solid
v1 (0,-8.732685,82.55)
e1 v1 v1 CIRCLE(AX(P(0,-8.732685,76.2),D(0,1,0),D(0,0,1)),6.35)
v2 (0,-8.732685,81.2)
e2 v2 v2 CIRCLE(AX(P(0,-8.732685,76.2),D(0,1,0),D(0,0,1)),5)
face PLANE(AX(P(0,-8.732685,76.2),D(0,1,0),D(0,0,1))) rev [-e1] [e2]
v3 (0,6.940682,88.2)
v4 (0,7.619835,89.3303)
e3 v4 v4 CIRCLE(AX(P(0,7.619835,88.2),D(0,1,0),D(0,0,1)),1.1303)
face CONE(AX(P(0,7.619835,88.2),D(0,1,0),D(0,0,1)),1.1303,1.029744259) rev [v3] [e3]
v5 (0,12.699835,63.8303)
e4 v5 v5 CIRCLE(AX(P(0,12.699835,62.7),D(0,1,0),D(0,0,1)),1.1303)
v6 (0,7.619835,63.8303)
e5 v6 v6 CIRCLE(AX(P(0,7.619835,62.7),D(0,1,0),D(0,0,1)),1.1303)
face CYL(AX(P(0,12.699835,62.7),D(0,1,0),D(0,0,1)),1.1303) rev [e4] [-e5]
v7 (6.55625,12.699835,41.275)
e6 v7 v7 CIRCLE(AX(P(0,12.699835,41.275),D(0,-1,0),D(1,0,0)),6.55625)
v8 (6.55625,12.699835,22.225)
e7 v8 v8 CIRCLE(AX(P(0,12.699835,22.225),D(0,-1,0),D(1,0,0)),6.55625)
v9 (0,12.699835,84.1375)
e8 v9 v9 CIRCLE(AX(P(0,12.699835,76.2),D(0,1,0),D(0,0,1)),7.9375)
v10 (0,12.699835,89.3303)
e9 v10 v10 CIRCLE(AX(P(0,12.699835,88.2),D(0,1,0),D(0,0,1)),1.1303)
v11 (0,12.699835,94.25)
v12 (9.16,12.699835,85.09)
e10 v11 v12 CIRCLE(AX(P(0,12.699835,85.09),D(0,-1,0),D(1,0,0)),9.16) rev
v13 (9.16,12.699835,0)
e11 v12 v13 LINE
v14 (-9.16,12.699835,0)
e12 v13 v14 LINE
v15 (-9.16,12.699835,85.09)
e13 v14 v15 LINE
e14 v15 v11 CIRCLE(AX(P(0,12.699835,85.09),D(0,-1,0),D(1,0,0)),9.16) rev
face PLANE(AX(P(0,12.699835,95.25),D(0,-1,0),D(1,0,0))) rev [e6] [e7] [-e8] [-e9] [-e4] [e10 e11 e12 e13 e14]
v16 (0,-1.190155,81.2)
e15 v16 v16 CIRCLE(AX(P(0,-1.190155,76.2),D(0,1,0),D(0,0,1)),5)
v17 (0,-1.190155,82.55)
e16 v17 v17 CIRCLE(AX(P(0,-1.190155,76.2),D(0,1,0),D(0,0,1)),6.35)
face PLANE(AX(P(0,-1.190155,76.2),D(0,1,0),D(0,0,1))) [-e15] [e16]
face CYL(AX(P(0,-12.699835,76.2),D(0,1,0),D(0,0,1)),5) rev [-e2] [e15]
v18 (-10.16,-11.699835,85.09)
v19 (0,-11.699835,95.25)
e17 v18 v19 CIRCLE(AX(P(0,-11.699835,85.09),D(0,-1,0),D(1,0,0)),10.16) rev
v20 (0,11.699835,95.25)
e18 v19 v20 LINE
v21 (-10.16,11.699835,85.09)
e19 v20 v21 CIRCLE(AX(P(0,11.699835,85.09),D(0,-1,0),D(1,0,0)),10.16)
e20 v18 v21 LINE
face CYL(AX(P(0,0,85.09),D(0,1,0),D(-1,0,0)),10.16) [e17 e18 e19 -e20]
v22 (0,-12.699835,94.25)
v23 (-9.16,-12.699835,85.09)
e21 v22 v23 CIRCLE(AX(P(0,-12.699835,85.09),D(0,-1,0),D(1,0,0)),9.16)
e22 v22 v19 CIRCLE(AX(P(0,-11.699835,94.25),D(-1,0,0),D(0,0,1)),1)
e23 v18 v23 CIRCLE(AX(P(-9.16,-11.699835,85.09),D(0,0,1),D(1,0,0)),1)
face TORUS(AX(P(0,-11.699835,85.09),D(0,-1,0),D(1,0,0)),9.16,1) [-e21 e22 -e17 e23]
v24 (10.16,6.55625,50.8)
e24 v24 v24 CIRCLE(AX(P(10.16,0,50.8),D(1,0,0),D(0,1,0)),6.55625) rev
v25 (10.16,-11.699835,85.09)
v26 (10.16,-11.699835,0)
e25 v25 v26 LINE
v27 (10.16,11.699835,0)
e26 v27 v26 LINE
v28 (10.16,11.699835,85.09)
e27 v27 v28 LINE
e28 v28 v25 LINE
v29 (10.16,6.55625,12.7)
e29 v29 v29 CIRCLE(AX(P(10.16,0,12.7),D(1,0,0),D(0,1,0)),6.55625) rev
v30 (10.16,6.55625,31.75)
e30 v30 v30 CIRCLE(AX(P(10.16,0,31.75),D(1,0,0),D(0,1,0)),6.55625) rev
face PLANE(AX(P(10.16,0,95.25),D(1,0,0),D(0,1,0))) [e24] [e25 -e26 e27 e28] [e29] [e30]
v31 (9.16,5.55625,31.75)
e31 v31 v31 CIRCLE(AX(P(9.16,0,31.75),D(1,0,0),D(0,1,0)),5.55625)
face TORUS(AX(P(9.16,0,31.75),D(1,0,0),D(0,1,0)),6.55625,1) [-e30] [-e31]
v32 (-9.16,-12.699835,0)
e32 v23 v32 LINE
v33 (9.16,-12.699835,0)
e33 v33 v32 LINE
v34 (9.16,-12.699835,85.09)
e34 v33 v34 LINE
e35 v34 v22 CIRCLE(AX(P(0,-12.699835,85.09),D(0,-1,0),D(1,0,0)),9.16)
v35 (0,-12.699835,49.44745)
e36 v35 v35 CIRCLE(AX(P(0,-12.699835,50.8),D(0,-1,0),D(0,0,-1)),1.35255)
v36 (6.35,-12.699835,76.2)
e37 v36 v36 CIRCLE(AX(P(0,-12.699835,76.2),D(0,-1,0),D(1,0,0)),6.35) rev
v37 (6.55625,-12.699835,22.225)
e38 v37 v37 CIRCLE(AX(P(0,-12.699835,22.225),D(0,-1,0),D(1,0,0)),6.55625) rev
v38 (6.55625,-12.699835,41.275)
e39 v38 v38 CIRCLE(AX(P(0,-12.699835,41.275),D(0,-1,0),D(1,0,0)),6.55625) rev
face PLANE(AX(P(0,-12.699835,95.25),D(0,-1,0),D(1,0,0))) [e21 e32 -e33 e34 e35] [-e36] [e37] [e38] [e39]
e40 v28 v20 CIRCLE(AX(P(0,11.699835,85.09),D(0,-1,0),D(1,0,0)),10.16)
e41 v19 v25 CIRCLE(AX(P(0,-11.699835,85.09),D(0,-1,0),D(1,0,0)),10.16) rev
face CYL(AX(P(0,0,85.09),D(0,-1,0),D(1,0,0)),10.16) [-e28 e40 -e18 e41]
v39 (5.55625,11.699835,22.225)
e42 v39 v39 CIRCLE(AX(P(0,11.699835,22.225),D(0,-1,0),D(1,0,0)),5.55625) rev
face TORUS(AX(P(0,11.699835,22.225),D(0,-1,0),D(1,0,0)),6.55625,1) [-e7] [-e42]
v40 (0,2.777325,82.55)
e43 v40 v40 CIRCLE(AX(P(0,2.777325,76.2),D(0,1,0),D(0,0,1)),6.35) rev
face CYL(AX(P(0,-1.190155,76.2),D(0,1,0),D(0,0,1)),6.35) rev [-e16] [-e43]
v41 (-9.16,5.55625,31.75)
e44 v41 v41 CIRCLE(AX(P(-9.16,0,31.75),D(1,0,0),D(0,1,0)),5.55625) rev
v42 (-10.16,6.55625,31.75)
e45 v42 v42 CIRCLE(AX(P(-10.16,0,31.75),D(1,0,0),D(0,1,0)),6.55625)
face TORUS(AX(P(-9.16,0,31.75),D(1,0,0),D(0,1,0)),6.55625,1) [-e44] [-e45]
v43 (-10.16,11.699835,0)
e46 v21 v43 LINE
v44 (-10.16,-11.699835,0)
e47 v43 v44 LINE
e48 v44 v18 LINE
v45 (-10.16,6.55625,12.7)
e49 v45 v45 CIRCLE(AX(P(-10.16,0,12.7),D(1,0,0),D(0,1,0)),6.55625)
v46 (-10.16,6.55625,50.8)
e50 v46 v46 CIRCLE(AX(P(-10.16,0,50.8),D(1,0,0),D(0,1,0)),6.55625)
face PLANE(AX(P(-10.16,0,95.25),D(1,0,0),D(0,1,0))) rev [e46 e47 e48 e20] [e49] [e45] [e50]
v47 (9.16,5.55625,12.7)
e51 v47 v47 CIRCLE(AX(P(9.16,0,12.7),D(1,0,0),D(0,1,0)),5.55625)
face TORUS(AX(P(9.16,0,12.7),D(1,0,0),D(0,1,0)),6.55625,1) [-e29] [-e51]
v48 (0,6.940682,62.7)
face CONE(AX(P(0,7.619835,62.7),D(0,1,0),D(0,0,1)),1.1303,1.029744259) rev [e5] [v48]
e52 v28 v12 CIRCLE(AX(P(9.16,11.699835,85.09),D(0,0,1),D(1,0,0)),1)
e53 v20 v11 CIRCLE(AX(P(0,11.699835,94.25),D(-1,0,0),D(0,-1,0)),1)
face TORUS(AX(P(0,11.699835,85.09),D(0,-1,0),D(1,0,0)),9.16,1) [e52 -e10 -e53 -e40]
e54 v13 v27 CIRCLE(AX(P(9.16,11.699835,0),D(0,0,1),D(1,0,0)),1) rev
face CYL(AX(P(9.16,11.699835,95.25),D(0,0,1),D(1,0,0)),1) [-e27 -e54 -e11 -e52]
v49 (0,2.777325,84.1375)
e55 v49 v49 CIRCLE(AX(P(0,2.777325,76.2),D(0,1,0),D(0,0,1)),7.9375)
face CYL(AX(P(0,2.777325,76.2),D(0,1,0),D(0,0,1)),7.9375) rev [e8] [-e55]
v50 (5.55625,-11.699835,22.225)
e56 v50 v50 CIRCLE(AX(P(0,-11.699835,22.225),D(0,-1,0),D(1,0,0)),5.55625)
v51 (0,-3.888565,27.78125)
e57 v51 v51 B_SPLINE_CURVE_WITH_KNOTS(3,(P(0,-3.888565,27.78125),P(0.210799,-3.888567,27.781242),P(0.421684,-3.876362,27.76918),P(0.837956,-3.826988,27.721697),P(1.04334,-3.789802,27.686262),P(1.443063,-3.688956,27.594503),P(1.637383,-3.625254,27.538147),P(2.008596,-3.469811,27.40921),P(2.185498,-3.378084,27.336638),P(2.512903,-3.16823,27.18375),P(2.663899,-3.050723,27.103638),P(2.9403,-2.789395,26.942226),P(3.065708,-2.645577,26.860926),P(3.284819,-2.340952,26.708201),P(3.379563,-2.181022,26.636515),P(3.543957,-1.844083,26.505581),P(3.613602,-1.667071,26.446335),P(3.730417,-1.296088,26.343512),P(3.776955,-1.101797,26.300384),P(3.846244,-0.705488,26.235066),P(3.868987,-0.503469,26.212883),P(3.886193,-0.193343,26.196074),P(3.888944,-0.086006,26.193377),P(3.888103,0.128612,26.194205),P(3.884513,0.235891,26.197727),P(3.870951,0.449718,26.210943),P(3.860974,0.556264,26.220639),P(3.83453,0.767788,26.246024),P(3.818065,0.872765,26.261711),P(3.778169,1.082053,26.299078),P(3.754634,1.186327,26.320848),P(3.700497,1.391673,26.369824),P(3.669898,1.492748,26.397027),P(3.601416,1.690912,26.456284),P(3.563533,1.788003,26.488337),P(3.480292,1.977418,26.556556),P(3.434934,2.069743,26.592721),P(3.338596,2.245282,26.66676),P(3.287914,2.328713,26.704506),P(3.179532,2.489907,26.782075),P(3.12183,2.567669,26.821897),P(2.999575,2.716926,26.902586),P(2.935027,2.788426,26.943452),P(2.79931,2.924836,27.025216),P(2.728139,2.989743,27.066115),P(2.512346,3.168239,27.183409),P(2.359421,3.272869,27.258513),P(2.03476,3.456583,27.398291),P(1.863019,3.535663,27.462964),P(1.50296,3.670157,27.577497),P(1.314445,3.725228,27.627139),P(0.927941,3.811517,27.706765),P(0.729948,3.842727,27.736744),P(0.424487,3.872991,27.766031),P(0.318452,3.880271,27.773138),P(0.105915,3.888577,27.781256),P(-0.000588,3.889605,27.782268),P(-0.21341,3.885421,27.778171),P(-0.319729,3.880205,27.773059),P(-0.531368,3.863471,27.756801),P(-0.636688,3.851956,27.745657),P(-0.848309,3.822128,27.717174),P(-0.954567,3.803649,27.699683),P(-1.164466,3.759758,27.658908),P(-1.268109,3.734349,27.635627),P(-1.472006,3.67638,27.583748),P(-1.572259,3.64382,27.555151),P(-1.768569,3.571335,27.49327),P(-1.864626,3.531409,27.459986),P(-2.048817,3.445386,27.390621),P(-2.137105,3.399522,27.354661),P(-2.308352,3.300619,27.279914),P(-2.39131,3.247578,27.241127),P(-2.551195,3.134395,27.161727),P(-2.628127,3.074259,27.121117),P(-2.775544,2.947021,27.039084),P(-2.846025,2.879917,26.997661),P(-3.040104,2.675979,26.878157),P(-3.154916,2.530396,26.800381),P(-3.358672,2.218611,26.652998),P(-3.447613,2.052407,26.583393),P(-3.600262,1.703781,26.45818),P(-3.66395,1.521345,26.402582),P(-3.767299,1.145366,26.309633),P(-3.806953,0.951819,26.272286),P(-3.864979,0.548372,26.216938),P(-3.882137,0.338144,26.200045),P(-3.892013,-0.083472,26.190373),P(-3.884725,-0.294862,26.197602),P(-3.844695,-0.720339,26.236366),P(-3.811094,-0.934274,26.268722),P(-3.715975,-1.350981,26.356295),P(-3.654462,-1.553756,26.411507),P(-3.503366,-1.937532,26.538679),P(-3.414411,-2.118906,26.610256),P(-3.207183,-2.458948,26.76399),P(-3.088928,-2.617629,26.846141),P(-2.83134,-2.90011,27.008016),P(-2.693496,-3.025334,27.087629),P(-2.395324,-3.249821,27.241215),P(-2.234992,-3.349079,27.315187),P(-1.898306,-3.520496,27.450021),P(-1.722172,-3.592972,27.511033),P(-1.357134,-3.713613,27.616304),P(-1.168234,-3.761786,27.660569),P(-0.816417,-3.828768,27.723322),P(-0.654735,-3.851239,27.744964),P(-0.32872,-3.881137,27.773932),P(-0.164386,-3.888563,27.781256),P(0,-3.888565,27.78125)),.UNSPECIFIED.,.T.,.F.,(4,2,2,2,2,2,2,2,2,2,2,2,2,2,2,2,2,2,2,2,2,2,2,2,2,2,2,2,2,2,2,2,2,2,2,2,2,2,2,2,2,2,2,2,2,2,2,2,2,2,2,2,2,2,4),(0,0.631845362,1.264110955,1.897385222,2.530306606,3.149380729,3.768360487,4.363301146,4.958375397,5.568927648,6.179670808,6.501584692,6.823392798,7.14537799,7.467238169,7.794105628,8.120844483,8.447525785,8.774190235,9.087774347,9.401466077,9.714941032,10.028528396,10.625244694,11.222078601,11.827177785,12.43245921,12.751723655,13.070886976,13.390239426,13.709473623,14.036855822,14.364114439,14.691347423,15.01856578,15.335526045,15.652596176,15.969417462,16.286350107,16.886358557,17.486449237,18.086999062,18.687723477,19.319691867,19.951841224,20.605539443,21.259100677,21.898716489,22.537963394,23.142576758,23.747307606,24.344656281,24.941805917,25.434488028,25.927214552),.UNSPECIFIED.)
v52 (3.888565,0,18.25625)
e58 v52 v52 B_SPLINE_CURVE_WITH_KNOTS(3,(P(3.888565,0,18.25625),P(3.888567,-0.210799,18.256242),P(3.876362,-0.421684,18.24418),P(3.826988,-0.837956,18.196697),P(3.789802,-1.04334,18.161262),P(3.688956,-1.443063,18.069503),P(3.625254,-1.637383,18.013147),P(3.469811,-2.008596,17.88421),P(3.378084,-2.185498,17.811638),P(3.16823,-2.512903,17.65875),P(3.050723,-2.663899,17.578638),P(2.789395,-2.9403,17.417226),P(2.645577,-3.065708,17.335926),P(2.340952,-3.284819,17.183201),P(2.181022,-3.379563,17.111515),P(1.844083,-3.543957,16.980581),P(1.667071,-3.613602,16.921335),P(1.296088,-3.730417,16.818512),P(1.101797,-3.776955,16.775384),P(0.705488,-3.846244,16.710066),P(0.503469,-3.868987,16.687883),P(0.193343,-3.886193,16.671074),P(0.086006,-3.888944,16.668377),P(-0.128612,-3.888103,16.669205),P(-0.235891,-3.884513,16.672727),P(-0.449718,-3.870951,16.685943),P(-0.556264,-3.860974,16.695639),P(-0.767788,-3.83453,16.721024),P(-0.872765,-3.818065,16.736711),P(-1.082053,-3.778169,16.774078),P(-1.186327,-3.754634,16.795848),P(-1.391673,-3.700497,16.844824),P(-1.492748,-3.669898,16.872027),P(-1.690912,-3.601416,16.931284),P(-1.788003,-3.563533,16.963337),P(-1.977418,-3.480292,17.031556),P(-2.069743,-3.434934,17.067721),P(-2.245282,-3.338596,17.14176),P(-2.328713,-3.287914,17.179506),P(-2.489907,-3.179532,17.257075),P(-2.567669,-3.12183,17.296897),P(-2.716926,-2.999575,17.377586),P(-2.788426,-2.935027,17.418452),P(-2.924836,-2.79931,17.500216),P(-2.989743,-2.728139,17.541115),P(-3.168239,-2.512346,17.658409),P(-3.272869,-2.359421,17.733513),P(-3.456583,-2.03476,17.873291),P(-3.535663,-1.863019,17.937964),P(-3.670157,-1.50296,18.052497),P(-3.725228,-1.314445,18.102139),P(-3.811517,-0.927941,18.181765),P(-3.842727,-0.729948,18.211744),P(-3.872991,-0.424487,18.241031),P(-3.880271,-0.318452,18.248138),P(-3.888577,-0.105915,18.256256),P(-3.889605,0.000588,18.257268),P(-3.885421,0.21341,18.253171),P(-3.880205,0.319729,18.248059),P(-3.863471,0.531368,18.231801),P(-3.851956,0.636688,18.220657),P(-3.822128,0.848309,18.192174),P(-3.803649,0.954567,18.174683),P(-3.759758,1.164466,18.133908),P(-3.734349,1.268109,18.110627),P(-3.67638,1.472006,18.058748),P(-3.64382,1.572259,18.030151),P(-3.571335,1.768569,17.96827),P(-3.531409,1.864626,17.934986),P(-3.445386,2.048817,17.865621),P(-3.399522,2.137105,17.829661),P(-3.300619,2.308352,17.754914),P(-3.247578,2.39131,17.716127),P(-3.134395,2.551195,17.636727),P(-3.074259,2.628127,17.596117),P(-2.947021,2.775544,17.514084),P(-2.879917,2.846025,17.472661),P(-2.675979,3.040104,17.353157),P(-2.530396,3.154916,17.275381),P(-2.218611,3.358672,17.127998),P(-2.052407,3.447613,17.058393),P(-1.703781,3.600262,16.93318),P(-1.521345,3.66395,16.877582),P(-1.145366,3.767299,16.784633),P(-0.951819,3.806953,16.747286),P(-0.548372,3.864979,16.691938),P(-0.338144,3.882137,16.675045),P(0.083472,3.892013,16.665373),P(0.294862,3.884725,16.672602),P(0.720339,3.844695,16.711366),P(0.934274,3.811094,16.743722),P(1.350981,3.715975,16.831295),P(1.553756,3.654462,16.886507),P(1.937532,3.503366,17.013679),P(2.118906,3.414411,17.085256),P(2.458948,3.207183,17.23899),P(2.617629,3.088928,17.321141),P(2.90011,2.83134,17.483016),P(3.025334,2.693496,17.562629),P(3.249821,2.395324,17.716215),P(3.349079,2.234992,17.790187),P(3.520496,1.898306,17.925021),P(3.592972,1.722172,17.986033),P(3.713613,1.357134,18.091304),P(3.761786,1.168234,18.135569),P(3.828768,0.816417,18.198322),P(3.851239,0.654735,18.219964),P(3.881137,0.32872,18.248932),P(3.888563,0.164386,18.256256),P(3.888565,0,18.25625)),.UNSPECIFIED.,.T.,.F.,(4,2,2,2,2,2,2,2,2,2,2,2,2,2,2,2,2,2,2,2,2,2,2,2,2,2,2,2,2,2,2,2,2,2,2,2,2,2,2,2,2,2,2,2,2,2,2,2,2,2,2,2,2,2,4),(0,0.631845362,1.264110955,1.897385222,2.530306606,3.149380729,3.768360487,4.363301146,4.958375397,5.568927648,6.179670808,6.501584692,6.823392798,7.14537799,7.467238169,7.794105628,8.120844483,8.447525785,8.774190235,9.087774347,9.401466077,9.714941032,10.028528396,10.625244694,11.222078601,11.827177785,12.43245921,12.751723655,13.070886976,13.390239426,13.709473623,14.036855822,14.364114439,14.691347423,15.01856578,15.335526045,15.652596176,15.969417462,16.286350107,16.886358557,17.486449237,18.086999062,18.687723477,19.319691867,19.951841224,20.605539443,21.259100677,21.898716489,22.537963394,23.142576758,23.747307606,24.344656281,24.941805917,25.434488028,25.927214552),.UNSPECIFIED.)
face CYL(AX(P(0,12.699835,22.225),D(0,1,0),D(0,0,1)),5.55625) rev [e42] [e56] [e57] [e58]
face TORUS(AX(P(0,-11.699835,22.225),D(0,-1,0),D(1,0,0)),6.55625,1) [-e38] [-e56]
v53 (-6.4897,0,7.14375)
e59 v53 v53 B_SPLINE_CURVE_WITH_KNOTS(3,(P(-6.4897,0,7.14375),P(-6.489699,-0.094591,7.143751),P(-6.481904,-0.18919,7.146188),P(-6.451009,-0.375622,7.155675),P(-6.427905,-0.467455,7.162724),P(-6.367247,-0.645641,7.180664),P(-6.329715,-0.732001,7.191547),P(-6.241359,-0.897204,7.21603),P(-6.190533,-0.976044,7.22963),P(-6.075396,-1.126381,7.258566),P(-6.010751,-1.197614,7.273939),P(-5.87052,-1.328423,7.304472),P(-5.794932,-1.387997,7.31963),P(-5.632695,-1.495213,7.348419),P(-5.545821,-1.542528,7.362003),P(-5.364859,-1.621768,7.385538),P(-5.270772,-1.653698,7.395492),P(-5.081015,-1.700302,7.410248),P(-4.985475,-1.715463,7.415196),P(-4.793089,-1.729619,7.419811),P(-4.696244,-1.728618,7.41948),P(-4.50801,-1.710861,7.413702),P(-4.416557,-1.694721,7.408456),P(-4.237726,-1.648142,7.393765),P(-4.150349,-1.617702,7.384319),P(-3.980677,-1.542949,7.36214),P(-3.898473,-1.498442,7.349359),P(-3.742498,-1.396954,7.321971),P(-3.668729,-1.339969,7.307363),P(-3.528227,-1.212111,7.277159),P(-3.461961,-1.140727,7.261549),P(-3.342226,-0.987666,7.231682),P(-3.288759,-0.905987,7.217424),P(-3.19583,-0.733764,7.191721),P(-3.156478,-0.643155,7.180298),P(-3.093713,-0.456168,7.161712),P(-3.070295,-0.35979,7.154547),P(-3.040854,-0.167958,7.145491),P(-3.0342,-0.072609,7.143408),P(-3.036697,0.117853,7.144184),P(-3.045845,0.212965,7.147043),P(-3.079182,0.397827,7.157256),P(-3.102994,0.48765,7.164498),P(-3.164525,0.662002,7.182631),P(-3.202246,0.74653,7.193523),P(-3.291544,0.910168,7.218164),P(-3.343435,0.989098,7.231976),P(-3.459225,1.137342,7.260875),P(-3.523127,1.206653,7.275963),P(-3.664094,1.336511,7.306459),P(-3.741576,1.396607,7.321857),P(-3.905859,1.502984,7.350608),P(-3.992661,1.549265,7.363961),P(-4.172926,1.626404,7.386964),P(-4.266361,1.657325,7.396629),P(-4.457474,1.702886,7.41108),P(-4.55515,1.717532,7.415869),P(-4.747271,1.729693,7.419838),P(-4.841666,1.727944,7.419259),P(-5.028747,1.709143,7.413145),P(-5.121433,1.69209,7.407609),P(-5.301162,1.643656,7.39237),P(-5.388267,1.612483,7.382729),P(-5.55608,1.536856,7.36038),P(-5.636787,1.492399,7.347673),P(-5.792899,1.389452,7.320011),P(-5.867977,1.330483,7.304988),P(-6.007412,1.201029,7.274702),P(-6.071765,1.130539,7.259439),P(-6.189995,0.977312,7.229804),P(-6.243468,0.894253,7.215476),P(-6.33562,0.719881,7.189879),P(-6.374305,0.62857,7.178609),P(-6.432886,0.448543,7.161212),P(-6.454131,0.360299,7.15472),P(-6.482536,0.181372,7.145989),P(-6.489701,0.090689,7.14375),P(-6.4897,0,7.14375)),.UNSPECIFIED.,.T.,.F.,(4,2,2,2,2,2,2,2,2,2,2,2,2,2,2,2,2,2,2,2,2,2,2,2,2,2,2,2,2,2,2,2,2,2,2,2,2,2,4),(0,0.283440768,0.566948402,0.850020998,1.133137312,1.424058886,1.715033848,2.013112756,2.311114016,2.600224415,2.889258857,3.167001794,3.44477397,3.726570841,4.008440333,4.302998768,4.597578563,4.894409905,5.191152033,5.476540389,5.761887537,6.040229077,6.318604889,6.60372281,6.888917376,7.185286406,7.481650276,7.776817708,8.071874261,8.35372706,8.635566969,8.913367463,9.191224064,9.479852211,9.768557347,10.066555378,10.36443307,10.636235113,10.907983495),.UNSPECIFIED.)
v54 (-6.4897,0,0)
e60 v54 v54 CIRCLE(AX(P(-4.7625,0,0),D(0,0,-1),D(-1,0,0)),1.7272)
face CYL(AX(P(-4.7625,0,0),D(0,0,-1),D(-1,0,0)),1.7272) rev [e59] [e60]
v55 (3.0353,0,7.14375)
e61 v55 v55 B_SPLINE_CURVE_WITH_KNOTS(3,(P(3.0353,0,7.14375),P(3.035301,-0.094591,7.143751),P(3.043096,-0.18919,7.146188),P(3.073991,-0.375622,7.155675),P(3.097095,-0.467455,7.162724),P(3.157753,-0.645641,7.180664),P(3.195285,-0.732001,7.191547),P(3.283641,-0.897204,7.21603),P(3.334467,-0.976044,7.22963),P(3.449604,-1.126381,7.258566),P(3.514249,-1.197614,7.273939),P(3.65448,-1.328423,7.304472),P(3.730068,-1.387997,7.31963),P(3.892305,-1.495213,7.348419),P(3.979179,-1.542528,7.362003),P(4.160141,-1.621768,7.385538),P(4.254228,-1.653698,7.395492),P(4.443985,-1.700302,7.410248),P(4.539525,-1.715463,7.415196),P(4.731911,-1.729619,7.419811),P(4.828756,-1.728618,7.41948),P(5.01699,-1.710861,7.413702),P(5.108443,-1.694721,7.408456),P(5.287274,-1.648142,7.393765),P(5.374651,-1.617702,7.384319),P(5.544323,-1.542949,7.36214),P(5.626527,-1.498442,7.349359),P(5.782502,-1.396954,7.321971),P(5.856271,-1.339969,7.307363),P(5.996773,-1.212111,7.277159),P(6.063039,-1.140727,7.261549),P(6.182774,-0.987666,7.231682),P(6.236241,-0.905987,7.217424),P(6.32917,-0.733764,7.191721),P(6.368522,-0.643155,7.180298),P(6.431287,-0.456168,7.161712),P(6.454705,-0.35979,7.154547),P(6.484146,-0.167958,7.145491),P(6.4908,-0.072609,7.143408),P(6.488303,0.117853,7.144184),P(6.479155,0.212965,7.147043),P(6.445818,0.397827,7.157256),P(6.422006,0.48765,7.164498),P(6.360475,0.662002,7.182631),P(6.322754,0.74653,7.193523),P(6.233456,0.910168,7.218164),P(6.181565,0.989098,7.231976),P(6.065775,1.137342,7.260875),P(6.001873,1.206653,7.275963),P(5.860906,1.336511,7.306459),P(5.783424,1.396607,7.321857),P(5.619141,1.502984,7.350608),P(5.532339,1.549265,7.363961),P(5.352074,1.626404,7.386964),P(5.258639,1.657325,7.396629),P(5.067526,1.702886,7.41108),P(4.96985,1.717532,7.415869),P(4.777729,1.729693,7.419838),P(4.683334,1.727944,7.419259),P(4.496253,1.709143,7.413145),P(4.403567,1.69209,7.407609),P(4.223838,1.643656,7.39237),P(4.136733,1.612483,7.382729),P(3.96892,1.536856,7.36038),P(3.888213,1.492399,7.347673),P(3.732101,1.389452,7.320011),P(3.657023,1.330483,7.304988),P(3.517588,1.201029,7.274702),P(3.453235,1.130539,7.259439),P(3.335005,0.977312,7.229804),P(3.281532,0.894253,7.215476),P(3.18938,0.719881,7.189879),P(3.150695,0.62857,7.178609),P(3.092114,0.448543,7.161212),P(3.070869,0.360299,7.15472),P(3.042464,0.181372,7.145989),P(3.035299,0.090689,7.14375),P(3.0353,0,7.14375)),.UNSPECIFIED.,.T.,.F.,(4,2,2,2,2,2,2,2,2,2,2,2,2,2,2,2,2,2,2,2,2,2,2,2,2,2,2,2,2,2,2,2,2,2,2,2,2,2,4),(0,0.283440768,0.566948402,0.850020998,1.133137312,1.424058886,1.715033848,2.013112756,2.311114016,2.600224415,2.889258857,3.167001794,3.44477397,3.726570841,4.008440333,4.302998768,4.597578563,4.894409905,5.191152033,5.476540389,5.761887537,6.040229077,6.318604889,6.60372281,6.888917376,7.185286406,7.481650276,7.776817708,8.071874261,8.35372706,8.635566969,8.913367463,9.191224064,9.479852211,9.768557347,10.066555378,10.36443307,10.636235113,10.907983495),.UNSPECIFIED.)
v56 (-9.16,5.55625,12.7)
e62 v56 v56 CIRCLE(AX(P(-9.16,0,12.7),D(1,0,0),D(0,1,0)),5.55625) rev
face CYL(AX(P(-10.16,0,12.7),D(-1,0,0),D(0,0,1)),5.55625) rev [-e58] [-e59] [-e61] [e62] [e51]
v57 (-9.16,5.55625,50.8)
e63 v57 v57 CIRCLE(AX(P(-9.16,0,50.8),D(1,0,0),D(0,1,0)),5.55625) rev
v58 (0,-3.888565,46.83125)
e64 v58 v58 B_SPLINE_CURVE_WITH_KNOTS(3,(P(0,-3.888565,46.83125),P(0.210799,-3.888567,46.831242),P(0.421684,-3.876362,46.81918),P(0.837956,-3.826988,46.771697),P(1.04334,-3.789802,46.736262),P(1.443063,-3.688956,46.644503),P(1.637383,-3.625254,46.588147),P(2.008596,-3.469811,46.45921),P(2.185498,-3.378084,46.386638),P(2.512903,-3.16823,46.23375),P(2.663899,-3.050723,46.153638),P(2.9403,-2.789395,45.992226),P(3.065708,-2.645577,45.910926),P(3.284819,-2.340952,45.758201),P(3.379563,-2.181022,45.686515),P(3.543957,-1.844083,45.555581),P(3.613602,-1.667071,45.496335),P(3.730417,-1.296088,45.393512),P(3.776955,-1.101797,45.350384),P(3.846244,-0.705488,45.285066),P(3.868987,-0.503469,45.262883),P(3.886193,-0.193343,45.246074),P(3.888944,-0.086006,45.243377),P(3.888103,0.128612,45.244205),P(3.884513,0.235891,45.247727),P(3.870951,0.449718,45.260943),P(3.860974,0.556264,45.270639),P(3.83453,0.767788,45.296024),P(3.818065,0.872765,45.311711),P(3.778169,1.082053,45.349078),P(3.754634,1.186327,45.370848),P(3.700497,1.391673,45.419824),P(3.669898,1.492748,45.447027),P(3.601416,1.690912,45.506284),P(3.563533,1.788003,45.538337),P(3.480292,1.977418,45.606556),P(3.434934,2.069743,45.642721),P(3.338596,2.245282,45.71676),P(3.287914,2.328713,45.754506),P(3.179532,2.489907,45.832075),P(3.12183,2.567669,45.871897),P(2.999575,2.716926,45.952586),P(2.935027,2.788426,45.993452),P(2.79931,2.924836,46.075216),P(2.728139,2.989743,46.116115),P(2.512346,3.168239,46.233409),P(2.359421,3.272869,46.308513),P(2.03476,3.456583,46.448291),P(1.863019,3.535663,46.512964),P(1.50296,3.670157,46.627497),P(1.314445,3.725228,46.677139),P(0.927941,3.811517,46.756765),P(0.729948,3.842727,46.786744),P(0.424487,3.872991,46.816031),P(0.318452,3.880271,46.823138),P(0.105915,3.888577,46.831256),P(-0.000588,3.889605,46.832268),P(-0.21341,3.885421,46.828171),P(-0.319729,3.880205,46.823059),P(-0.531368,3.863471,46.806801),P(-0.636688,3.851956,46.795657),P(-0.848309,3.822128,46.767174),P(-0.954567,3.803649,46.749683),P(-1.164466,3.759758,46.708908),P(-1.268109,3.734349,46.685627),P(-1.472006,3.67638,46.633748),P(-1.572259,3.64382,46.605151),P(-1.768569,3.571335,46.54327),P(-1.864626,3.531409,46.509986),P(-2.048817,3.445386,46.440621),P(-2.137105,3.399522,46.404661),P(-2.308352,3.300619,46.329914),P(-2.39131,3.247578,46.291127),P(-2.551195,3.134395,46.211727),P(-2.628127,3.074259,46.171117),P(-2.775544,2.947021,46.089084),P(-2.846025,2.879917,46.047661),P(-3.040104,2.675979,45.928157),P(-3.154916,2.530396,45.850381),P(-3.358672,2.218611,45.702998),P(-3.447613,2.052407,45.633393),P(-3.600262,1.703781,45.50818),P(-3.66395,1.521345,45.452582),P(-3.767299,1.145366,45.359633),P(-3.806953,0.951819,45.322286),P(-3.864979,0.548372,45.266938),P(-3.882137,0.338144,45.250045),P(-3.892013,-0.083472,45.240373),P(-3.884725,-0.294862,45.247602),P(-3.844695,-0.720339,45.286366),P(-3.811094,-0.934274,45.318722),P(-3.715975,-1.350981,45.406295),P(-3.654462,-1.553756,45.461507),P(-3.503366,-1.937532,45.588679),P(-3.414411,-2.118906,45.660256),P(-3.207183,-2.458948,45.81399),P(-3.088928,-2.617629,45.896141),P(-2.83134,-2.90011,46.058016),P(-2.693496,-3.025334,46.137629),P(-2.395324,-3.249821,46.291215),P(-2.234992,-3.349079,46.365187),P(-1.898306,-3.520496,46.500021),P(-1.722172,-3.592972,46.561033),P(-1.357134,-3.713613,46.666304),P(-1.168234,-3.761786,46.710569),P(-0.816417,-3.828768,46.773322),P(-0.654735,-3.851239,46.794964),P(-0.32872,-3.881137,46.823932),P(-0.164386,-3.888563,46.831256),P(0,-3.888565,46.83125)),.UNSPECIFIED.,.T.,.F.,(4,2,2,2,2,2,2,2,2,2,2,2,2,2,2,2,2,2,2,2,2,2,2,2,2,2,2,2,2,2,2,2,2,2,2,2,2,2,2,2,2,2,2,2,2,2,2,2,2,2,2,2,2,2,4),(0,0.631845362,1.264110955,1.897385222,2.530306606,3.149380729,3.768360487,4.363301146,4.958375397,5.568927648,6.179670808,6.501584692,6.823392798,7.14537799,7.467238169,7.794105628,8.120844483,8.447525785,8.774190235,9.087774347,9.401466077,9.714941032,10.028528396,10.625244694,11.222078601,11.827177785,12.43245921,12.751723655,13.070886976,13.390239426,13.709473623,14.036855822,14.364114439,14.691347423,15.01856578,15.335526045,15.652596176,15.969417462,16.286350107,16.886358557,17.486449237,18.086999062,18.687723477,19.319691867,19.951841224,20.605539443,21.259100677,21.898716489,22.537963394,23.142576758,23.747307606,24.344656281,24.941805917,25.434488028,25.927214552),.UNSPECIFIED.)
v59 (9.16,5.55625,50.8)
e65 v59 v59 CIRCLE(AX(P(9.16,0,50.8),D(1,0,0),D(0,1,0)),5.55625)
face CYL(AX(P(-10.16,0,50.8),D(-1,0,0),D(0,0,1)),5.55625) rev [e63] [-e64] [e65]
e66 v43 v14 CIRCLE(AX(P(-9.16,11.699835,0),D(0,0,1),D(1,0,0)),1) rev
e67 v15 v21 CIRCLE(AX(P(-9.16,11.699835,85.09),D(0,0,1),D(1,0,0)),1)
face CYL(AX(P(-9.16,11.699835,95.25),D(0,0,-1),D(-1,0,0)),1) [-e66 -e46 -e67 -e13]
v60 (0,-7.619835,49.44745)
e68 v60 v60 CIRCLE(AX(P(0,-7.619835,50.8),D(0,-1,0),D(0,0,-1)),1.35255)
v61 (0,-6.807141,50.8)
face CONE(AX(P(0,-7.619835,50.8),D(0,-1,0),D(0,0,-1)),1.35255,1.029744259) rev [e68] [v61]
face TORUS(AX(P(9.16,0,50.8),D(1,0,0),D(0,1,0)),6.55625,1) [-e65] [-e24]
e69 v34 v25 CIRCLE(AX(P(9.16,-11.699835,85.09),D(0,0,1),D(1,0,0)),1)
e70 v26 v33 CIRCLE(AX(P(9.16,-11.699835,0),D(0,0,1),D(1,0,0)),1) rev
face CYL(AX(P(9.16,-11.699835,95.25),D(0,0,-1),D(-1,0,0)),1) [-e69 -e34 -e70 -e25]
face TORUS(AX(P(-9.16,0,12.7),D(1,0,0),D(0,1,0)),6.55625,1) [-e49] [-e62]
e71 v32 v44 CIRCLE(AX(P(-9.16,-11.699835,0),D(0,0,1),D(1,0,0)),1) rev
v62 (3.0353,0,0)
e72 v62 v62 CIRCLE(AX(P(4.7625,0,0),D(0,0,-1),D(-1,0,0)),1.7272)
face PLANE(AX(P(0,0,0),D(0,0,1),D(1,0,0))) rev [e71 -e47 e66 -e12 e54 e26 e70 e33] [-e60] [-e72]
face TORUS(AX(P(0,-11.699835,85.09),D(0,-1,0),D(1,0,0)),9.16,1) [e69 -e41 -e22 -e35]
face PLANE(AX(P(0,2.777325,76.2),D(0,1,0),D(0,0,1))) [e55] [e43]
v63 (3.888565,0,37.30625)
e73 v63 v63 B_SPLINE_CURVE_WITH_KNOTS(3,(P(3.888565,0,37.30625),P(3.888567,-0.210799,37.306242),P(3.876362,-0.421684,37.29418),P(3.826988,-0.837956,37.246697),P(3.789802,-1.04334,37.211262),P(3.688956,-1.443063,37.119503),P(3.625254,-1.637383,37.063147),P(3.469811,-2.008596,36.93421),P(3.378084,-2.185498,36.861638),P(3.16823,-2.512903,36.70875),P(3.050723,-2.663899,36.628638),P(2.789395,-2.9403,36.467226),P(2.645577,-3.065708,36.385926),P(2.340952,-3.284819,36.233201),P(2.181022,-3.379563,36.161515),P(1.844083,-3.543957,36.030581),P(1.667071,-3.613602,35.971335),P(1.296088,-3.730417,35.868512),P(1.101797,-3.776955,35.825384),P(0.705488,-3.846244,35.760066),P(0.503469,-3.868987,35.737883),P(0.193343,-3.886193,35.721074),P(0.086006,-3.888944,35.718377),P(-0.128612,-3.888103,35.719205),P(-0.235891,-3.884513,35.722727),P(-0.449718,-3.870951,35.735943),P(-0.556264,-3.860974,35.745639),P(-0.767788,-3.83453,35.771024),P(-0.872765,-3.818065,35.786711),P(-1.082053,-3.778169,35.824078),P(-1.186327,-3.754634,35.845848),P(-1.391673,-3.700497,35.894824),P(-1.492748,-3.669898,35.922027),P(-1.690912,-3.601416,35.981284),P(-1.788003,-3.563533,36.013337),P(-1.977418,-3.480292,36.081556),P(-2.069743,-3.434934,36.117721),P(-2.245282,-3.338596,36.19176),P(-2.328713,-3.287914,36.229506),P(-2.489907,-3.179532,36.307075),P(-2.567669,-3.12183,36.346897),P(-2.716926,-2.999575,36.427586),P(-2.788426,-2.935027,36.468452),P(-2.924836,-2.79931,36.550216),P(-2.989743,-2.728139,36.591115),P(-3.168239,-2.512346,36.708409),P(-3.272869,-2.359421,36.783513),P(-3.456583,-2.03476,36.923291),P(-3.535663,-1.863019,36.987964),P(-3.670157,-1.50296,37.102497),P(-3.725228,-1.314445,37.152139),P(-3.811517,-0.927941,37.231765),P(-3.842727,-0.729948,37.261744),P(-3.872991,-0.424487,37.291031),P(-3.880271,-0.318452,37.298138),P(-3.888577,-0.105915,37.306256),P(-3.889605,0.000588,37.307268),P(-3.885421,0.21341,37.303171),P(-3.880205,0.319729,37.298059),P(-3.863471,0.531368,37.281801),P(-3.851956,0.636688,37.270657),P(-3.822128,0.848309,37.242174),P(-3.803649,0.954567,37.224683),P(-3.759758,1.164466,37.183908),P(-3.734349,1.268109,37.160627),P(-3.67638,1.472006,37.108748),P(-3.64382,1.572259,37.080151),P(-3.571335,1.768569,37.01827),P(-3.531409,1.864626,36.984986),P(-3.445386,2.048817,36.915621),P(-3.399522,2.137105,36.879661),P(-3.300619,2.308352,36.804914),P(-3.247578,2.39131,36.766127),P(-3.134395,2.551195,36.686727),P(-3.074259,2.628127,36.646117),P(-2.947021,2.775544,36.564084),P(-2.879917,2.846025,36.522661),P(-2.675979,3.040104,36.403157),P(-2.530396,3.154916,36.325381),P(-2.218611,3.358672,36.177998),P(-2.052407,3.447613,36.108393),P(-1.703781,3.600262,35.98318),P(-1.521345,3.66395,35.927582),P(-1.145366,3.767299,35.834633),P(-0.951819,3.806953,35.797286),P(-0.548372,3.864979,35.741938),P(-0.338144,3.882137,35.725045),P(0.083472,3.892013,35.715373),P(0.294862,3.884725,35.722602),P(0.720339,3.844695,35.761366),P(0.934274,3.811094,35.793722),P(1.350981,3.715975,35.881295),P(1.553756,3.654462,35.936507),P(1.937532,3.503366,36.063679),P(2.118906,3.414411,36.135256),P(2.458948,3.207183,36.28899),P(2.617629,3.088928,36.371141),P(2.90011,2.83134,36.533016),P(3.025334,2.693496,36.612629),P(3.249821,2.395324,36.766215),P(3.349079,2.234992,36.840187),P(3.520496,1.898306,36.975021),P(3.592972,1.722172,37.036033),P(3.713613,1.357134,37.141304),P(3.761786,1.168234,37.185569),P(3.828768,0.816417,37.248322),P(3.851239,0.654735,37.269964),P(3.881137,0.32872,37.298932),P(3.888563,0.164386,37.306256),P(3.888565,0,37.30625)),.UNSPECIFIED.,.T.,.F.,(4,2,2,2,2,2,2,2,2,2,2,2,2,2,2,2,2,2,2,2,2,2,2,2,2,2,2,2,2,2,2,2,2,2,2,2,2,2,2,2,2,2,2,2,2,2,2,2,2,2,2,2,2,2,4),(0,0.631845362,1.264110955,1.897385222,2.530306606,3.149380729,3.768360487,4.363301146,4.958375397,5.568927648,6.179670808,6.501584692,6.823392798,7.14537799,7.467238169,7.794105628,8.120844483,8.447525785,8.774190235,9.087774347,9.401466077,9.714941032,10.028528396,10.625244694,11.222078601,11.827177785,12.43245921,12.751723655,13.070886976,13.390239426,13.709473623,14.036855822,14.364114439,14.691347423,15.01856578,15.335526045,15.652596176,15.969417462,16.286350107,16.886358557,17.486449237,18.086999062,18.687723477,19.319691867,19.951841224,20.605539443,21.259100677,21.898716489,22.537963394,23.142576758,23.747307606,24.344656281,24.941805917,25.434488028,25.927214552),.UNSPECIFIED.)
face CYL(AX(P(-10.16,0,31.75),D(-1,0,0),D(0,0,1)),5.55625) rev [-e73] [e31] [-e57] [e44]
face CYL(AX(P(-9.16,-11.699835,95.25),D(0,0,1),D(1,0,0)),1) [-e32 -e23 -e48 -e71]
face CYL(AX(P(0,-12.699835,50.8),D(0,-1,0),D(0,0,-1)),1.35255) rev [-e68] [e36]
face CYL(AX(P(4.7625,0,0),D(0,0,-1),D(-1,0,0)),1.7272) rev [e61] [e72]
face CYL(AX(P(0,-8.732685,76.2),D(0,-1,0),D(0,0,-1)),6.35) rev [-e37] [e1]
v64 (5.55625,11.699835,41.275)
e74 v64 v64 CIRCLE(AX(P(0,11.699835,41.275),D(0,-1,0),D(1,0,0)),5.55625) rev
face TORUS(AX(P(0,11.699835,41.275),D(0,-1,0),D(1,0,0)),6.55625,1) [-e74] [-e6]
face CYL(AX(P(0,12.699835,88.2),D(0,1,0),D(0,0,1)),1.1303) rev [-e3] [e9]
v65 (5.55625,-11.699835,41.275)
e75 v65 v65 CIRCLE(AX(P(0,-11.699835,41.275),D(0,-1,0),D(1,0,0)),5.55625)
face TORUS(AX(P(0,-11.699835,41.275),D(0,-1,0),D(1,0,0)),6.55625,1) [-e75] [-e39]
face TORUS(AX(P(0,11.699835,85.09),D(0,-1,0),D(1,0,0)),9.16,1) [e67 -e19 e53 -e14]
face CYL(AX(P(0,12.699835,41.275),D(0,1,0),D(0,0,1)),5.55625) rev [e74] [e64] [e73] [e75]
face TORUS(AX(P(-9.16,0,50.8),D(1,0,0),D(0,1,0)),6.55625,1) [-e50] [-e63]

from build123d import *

# Parameters (mm, degrees)
SKETCH2_W                                = 20.32
SKETCH2_H                                = 25.399669802
BODY_DEPTH                               = 95.25
SKETCH3_R                                = 5
YAW_AXLE_OPENING_DEPTH                   = 100.100612138
TOP_START                                = -9.92251
SKETCH3_3_R                              = 6.35
SKETCH3_3_R_2                            = 5
TOP_YAW_BEARING_DEPTH                    = 3.96748
LOWER_START                              = -21.43252
SKETCH3_4_R                              = 6.35
SKETCH3_4_R_2                            = 5
LOWER_YAW_BEARING_DEPTH                  = 3.96748
SKETCH5_R                                = 7.9375
YAW_AXLE_CAP_RECESS_DEPTH                = 9.92251
F_4_40_TAPPED_HOLE1_D                    = 2.2606
F_4_40_TAPPED_HOLE1_DEPTH                = 5.08
F_4_40_TAPPED_HOLE1_TIP                  = 0.679152758
F_8_32_TAPPED_HOLE1_D                    = 3.4544
F_8_32_TAPPED_HOLE1_DEPTH                = 10.70864
F_8_32_TAPPED_HOLE1_TIP                  = 1.037806461
F_6_32_TAPPED_HOLE2_D                    = 2.7051
F_6_32_TAPPED_HOLE2_DEPTH                = 5.08
F_6_32_TAPPED_HOLE2_TIP                  = 0.81269403
F_7_16_0_4375_DIAMETER_HOLE1_D           = 11.1125
F_7_16_0_4375_DIAMETER_HOLE1_ON_FACE_2_D = 11.1125
FILLET1_R                                = 10.16
FILLET3_R                                = 1


with BuildPart() as part:
    # Sketch2 → Body (new body)
    with BuildSketch(Plane.XY):
        Rectangle(SKETCH2_W, SKETCH2_H)
    extrude(amount=BODY_DEPTH)

    # Sketch3 → Yaw Axle Opening (cut, through all)
    with BuildSketch(Plane(origin=(0, 12.699834901, 0), x_dir=(1, 0, 0), z_dir=(0, 1, 0))):
        with Locations(Location((0, -76.2, 0), (0, 0, 270))):
            Circle(SKETCH3_R)
        with BuildLine():
            ThreePointArc((5, -76.2), (3.535533906, -72.664466094), (0, -71.2))
            Line((0, -71.2), (0, -81.2))
            ThreePointArc((0, -81.2), (3.535533906, -79.735533906), (5, -76.2))
        make_face()
        with BuildLine():
            Line((0, -81.2), (0, -71.2))
            ThreePointArc((0, -71.2), (-5, -76.2), (0, -81.2))
        make_face()
    extrude(amount=-YAW_AXLE_OPENING_DEPTH, mode=Mode.SUBTRACT)

    # Sketch3<3> → Top Yaw Bearing (cut)
    with BuildSketch(Plane(origin=(0, 12.699834901, 0), x_dir=(1, 0, 0), z_dir=(0, 1, 0)).offset(TOP_START)):
        with Locations(Location((0, -76.2, 0), (0, 0, 270))):
            Circle(SKETCH3_3_R)
        with Locations(Location((0, -76.2, 0), (0, 0, 270))):
            Circle(SKETCH3_3_R_2, mode=Mode.SUBTRACT)
    extrude(amount=-TOP_YAW_BEARING_DEPTH, mode=Mode.SUBTRACT)

    # Sketch3<4> → Lower Yaw Bearing (cut)
    with BuildSketch(Plane(origin=(0, 12.699834901, 0), x_dir=(1, 0, 0), z_dir=(0, 1, 0)).offset(LOWER_START)):
        with Locations(Location((0, -76.2, 0), (0, 0, 270))):
            Circle(SKETCH3_4_R)
        with Locations(Location((0, -76.2, 0), (0, 0, 270))):
            Circle(SKETCH3_4_R_2, mode=Mode.SUBTRACT)
    extrude(amount=-LOWER_YAW_BEARING_DEPTH, mode=Mode.SUBTRACT)

    # Sketch5 → Yaw Axle Cap Recess (cut)
    with BuildSketch(Plane(origin=(0, 12.699834901, 0), x_dir=(1, 0, 0), z_dir=(0, 1, 0))):
        with Locations(Location((0, -76.2, 0), (0, 0, 270))):
            Circle(SKETCH5_R)
    extrude(amount=-YAW_AXLE_CAP_RECESS_DEPTH, mode=Mode.SUBTRACT)

    # #4-40 Tapped Hole1
    with Locations(Plane(origin=(0, 12.699834901, 62.7), x_dir=(1, 0, 0), z_dir=(0, 1, 0))):
        with Locations((0, 0), (0, -25.5)):
            Hole(F_4_40_TAPPED_HOLE1_D / 2, depth=F_4_40_TAPPED_HOLE1_DEPTH)
            with Locations((0, 0, -(F_4_40_TAPPED_HOLE1_DEPTH + F_4_40_TAPPED_HOLE1_TIP / 2))):  # 118° drill point
                Cone(0, F_4_40_TAPPED_HOLE1_D / 2, F_4_40_TAPPED_HOLE1_TIP, mode=Mode.SUBTRACT)

    # #8-32 Tapped Hole1
    with Locations(Plane(origin=(4.7625, 0, 0), x_dir=(-1, 0, 0), z_dir=(0, 0, -1))):
        with Locations((0, 0), (9.525, 0)):
            Hole(F_8_32_TAPPED_HOLE1_D / 2, depth=F_8_32_TAPPED_HOLE1_DEPTH)
            with Locations((0, 0, -(F_8_32_TAPPED_HOLE1_DEPTH + F_8_32_TAPPED_HOLE1_TIP / 2))):  # 118° drill point
                Cone(0, F_8_32_TAPPED_HOLE1_D / 2, F_8_32_TAPPED_HOLE1_TIP, mode=Mode.SUBTRACT)

    # #6-32 Tapped Hole2
    with Locations(Plane(origin=(-5.938258793, -12.699834901, -21.918133201), x_dir=(1, 0, 0), z_dir=(0, -1, 0))):
        with Locations((5.938258793, 72.718133201)):
            Hole(F_6_32_TAPPED_HOLE2_D / 2, depth=F_6_32_TAPPED_HOLE2_DEPTH)
            with Locations((0, 0, -(F_6_32_TAPPED_HOLE2_DEPTH + F_6_32_TAPPED_HOLE2_TIP / 2))):  # 118° drill point
                Cone(0, F_6_32_TAPPED_HOLE2_D / 2, F_6_32_TAPPED_HOLE2_TIP, mode=Mode.SUBTRACT)

    # 7/16 (0.4375) Diameter Hole1 (through all)
    with Locations(Plane(origin=(-10.16, 0, 12.7), x_dir=(0, -1, 0), z_dir=(-1, 0, 0))):
        with Locations((0, 0), (0, 19.05), (0, 38.1)):
            Hole(F_7_16_0_4375_DIAMETER_HOLE1_D / 2)

    # 7/16 (0.4375) Diameter Hole1 on face 2 (through all)
    with Locations(Plane(origin=(0, 12.699834901, 22.225), x_dir=(0, 0, 1), z_dir=(0, 1, 0))):
        with Locations((0, 0), (19.05, 0)):
            Hole(F_7_16_0_4375_DIAMETER_HOLE1_ON_FACE_2_D / 2)

    # Fillet1
    fillet1_edges = [part.edges().sort_by_distance(p)[0] for p in [
        (-10.16, 0, 95.25),
        (10.16, 0, 95.25),
    ]]
    fillet(fillet1_edges, radius=FILLET1_R - 0.0001)  # a hair under: the kernel refuses the full size

    # Fillet3
    fillet3_edges = [part.edges().sort_by_distance(p)[0] for p in [
        (10.16, 12.699834901, 42.54505),
        (7.184234186, 12.699834901, 92.274234186),
        (-7.184234186, 12.699834901, 92.274234186),
        (0, 12.699834901, 46.83125),
        (0, -12.699834901, 46.83125),
        (0, 12.699834901, 27.78125),
        (0, -12.699834901, 27.78125),
        (10.16, -5.55625, 50.8),
        (-10.16, -5.55625, 50.8),
        (10.16, -5.55625, 31.75),
        (-10.16, -5.55625, 31.75),
        (10.16, -5.55625, 12.7),
        (-10.16, -5.55625, 12.7),
        (10.16, -12.699834901, 42.54505),
        (-10.16, -12.699834901, 42.54505),
        (7.184234186, -12.699834901, 92.274234186),
        (-7.184234186, -12.699834901, 92.274234186),
        (-10.16, 12.699834901, 42.54505),
    ]]
    fillet(fillet3_edges, radius=FILLET3_R)


solid = part.part
